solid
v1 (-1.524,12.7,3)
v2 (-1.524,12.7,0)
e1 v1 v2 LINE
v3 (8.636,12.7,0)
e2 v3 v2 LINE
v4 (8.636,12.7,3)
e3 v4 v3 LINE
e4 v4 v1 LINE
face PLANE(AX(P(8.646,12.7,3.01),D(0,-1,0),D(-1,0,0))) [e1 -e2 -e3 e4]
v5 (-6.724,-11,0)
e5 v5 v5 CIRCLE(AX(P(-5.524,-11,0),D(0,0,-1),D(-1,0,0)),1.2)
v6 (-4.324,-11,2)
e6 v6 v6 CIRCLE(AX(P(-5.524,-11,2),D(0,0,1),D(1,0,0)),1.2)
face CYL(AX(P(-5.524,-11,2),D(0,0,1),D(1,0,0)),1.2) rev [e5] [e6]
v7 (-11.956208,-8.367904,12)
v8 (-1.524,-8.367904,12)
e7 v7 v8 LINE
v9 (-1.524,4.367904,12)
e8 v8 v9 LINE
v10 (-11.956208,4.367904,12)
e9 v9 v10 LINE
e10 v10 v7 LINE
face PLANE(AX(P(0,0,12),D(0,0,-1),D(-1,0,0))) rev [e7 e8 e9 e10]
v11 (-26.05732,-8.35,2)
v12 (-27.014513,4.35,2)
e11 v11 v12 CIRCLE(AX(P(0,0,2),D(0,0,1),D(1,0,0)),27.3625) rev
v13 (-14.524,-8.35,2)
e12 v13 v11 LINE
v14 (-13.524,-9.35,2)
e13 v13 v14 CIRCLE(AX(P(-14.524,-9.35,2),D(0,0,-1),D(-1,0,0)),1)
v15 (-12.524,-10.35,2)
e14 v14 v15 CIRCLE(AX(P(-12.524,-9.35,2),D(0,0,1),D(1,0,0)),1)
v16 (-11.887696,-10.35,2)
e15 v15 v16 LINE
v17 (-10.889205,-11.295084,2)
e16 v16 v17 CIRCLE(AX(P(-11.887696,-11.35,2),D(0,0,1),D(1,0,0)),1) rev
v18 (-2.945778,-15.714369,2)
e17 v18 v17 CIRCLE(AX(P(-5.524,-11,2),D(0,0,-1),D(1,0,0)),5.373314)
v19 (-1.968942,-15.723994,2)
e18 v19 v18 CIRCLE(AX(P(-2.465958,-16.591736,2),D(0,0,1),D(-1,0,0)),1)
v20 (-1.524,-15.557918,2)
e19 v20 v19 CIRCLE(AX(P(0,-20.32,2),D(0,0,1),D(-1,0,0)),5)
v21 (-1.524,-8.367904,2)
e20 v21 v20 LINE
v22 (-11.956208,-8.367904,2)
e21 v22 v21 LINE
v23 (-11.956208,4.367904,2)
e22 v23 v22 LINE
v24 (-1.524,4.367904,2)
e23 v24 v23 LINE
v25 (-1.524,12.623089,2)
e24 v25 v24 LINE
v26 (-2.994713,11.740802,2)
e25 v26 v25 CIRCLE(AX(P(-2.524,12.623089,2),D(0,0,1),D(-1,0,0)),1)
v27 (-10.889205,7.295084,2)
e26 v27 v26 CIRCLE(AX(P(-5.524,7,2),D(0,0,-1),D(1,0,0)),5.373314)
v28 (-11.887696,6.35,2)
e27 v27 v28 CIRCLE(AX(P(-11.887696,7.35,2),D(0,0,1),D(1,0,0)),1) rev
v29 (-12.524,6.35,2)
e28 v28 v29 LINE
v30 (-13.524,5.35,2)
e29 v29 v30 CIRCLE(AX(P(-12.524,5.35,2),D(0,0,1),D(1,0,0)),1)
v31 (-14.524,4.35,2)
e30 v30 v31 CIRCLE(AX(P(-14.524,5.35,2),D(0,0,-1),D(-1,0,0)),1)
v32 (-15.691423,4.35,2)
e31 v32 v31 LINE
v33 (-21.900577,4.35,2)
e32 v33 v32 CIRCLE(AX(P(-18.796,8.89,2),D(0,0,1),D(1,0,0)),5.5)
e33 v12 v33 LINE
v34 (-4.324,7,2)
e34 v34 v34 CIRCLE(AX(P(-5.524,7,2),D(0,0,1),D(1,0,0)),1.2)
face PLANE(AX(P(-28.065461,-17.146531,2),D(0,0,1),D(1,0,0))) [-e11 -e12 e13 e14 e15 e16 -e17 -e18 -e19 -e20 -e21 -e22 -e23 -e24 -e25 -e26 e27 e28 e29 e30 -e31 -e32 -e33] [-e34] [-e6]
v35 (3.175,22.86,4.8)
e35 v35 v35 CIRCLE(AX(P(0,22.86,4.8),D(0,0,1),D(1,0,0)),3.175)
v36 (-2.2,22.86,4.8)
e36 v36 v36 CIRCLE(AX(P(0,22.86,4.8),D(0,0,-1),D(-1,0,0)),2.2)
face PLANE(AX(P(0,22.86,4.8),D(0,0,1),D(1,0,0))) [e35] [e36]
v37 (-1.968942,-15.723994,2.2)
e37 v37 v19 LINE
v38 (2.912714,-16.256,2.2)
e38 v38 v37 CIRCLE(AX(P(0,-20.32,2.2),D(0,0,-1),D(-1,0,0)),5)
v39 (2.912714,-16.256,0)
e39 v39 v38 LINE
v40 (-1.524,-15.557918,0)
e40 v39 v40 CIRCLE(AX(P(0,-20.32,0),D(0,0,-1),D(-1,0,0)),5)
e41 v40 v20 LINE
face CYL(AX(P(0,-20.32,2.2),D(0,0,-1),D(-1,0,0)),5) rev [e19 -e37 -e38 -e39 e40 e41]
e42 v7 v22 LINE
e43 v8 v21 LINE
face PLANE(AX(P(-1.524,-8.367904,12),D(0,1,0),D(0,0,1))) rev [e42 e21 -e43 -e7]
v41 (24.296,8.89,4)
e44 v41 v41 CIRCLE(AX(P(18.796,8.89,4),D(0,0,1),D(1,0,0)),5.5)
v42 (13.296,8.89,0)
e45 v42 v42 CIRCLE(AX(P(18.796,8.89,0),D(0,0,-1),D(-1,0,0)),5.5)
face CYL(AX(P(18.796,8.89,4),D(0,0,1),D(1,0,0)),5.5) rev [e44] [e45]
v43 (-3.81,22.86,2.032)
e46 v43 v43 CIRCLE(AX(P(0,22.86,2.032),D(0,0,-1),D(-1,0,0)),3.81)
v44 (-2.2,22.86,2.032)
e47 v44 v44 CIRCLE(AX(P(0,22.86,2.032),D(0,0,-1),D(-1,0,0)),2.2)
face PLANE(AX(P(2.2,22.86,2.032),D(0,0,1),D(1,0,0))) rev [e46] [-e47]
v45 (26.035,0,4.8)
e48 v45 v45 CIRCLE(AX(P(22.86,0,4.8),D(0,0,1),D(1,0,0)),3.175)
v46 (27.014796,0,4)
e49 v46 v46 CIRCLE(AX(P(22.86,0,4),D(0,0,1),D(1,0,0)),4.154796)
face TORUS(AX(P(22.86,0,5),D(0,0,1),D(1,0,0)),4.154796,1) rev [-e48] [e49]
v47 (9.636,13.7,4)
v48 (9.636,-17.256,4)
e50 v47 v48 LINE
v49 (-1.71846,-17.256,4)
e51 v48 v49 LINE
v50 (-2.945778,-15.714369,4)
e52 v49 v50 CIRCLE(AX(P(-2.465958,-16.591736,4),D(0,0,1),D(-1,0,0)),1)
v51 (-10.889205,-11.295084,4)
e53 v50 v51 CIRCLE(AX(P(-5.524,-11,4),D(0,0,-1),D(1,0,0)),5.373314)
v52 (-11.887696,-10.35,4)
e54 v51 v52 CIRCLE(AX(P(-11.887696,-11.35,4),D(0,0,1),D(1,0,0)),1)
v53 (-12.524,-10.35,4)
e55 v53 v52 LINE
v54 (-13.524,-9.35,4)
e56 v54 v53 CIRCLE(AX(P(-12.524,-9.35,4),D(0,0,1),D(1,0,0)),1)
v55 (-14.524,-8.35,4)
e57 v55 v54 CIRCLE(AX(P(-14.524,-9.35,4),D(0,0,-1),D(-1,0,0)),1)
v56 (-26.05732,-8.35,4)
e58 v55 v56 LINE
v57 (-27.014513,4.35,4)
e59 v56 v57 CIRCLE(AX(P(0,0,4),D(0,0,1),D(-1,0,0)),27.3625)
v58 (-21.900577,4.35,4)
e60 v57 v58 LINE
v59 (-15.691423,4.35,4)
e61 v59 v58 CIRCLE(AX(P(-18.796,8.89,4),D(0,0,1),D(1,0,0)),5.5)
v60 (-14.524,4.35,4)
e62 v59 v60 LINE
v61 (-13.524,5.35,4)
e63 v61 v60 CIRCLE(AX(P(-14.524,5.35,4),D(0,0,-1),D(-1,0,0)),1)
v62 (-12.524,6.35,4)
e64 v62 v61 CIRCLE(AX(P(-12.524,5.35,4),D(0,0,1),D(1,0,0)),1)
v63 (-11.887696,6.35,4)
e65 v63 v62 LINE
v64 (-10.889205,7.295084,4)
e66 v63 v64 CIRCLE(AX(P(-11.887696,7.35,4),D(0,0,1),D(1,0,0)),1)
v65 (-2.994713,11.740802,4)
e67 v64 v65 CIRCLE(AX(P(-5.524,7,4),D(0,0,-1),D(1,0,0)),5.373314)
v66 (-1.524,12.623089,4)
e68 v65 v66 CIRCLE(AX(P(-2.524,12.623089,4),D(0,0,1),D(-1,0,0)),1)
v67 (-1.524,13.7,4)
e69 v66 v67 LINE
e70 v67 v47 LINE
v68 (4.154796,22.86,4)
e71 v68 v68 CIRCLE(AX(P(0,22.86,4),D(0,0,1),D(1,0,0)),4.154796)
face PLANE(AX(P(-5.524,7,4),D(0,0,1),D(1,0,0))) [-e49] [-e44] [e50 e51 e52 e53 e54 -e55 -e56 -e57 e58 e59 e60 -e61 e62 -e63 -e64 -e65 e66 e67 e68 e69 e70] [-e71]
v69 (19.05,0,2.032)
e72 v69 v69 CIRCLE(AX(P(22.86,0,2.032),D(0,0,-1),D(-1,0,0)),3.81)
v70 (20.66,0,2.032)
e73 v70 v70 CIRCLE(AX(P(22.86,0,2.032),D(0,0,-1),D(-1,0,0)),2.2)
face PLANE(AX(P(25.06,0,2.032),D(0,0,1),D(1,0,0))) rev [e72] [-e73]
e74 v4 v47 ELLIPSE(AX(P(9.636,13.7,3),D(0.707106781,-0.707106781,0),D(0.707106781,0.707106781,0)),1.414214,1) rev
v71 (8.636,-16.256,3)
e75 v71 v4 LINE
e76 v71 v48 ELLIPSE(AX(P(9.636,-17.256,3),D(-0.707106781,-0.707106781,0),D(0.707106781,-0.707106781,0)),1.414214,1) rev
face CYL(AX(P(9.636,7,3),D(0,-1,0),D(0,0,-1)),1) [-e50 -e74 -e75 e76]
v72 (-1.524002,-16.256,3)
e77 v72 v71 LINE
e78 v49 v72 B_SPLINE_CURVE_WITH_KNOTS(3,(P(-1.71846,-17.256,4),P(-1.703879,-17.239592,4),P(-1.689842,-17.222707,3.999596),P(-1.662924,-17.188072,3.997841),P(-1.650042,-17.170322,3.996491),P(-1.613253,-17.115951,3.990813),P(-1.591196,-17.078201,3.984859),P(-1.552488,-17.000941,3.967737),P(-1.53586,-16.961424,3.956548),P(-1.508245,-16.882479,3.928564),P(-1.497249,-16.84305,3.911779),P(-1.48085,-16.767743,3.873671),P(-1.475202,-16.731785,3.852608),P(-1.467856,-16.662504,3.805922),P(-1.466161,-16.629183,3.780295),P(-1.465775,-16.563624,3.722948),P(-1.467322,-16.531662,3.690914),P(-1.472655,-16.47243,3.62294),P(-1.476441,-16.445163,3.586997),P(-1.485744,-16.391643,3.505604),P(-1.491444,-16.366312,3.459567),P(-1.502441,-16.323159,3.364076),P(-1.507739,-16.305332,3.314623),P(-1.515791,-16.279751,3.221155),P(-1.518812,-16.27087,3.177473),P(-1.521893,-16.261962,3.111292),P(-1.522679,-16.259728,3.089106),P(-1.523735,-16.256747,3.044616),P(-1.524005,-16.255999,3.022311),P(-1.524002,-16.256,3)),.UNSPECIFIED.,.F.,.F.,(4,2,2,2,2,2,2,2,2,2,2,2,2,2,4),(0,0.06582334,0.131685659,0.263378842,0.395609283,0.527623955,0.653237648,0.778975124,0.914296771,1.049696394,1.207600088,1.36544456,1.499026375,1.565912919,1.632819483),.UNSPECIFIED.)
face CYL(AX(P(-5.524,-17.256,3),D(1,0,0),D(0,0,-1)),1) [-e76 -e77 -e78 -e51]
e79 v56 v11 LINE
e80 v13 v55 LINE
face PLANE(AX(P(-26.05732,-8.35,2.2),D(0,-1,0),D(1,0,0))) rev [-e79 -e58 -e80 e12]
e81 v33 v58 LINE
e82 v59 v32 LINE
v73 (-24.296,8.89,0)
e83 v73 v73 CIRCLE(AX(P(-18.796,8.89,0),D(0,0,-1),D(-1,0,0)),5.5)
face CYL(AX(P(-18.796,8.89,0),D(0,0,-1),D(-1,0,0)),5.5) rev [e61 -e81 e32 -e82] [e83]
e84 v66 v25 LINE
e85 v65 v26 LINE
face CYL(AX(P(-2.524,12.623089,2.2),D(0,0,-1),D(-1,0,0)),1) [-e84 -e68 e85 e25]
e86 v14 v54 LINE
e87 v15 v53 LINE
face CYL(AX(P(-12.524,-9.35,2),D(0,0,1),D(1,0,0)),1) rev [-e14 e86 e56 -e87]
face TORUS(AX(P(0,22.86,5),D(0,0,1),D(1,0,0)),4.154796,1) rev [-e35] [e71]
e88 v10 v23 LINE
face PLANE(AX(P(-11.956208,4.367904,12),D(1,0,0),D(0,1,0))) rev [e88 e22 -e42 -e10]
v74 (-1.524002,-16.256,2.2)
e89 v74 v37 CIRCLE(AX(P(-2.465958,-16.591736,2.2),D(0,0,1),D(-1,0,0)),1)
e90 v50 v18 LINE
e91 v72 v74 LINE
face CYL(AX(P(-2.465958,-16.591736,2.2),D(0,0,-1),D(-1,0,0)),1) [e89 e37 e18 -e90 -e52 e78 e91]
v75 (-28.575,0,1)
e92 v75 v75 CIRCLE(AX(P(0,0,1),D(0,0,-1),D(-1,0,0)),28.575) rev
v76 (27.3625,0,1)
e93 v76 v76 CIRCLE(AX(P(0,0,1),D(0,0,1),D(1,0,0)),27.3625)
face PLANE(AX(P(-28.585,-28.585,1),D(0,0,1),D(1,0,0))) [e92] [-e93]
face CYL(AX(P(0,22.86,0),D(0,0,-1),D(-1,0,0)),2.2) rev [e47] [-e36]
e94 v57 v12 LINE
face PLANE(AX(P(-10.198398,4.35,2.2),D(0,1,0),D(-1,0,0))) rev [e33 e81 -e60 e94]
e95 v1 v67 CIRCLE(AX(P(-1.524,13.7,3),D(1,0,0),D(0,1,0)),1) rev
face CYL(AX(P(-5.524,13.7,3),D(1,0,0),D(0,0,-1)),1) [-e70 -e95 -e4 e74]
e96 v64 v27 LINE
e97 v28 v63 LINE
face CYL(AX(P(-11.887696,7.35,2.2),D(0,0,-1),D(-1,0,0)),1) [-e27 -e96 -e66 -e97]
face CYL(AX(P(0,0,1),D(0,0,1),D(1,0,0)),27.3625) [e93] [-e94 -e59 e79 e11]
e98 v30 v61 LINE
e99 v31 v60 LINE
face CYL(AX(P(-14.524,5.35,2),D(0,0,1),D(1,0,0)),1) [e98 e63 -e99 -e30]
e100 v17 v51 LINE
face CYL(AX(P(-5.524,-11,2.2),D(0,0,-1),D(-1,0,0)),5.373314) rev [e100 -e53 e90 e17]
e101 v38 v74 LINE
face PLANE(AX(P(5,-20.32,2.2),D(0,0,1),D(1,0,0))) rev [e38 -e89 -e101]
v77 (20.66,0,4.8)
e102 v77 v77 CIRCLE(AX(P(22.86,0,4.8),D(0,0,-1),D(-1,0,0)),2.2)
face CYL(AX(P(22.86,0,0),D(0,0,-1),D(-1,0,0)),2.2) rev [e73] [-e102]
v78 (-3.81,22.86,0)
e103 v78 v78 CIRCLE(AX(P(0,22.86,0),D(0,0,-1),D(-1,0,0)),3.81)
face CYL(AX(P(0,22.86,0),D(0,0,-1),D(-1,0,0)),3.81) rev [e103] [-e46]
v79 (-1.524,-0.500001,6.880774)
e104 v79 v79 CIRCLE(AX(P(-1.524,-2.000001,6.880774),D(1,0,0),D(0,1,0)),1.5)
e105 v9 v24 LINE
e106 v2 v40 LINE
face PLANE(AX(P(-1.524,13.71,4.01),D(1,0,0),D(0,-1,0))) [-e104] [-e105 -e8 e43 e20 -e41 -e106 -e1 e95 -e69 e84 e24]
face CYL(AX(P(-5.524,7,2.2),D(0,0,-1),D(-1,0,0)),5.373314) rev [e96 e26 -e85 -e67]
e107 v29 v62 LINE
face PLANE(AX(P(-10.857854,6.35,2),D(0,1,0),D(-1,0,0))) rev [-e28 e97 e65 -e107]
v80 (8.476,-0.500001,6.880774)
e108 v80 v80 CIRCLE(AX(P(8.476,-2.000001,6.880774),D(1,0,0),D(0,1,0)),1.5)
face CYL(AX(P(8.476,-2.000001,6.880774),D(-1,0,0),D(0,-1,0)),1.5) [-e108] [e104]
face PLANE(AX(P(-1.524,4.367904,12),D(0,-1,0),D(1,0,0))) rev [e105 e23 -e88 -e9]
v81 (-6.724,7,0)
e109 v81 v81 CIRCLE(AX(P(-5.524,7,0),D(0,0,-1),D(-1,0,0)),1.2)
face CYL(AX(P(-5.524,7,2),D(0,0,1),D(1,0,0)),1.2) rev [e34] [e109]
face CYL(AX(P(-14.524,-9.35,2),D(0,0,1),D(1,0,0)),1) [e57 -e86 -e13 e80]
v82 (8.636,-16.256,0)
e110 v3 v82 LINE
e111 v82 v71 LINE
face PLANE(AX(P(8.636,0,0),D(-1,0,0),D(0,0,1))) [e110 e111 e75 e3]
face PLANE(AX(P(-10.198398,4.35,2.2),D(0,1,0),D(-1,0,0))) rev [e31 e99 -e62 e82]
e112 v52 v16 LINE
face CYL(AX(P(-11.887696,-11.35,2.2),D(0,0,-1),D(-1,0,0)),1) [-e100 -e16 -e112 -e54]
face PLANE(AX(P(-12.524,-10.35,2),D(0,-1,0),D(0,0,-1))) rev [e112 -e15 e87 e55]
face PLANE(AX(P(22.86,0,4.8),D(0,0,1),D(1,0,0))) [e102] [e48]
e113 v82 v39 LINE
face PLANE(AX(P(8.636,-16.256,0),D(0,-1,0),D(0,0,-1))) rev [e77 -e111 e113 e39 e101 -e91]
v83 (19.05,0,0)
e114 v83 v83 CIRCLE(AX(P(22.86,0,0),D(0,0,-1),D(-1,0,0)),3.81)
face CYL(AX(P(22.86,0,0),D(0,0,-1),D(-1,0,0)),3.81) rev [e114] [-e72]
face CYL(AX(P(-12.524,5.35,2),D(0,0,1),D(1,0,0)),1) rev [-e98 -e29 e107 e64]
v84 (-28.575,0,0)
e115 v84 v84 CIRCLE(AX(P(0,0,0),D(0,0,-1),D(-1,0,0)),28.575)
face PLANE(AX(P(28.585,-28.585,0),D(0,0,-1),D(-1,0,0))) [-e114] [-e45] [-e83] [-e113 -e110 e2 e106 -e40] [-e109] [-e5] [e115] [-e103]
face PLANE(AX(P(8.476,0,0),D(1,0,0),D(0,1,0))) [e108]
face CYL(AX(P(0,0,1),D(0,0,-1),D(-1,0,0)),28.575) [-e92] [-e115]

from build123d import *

# Parameters (mm, degrees)
BOSS_EXTRUDE1_START                              = -2
BOSS_EXTRUDE1_OUTLINE_R                          = 27.3625
BOSS_EXTRUDE1_DEPTH                              = 2
BOSS_EXTRUDE1_2_DEPTH                            = 0.2
BOSS_EXTRUDE1_3_OUTLINE_R                        = 28.575
BOSS_EXTRUDE1_3_OUTLINE_R_2                      = 27.3625
BOSS_EXTRUDE1_3_DEPTH                            = 1
SKETCH2_W                                        = 2.2
SKETCH2_H                                        = 28.956
CUT_EXTRUDE1_DEPTH                               = 5.723285802
BOSS_EXTRUDE2_DEPTH                              = 1.8
CUT_EXTRUDE2_START                               = -2
CUT_EXTRUDE2_DEPTH                               = 2
CUT_EXTRUDE3_START                               = -2
CUT_EXTRUDE3_DEPTH                               = 2
SKETCH6_W                                        = 5
SKETCH6_H                                        = 2.2
F_11_0_11_DIAMETER_HOLE1_D                       = 11
F_11_0_11_DIAMETER_HOLE2_D                       = 11
F_11_0_11_DIAMETER_HOLE2_DEPTH                   = 4.8
F_2_4_2_4_DIAMETER_HOLE1_D                       = 2.4
CBORE_FOR_M4_HEX_HEAD_MACHINE_SCREW1_D           = 4.4
CBORE_FOR_M4_HEX_HEAD_MACHINE_SCREW1_CBORE_D     = 7.62
CBORE_FOR_M4_HEX_HEAD_MACHINE_SCREW1_CBORE_DEPTH = 2.032
FILLET1_R                                        = 1
SKETCH17_W                                       = 10.432207601
SKETCH17_H                                       = 12.73580757
BOSS_EXTRUDE3_DEPTH                              = 10
SKETCH18_R                                       = 1.5
BOSS_EXTRUDE4_DEPTH                              = 10


with BuildPart() as part:
    # Boss-Extrude1: read off the stored shape, not the designer's step
    # Boss-Extrude1 outline → Boss-Extrude1 (new body)
    with BuildSketch(Plane.XY.offset(2).offset(BOSS_EXTRUDE1_START)):
        Circle(BOSS_EXTRUDE1_OUTLINE_R)
        with BuildLine():
            Line((-1.524, -15.557918103), (-1.524, 12.7))
            Line((-1.524, 12.7), (2.912714198, 12.7))
            Line((2.912714198, 12.7), (2.912714198, -16.256))
            ThreePointArc((2.912714198, -16.256), (0.777149513, -15.38076538), (-1.524, -15.557918103))
        make_face(mode=Mode.SUBTRACT)
    extrude(amount=BOSS_EXTRUDE1_DEPTH)

    # Boss-Extrude1 2 outline → Boss-Extrude1 2 (add)
    with BuildSketch(Plane.XY.offset(2)):
        with BuildLine():
            ThreePointArc((2.912714198, -16.256), (0.541695497, -15.349430014), (-1.968941943, -15.723994384))
            ThreePointArc((-1.968941943, -15.723994384), (-2.456104545, -15.591784186), (-2.945777915, -15.714368556))
            ThreePointArc((-2.945777915, -15.714368556), (-9.352442215, -14.770348817), (-10.198398357, -8.35))
            Line((-10.198398357, -8.35), (-26.057319629, -8.35))
            ThreePointArc((-26.057319629, -8.35), (27.285112269, 2.056466564), (-27.014512882, 4.35))
            Line((-27.014512882, 4.35), (-10.198398357, 4.35))
            ThreePointArc((-10.198398357, 4.35), (-9.371903961, 10.750484649), (-2.994712748, 11.740802252))
            ThreePointArc((-2.994712748, 11.740802252), (-2.00956475, 11.765559549), (-1.524, 12.623088776))
            Line((-1.524, 12.623088776), (-1.524, 12.7))
            Line((-1.524, 12.7), (2.912714198, 12.7))
            Line((2.912714198, 12.7), (2.912714198, -16.256))
        make_face()
    extrude(amount=BOSS_EXTRUDE1_2_DEPTH)

    # Boss-Extrude1 3 outline → Boss-Extrude1 3 (add)
    with BuildSketch(Plane.XY.offset(2).offset(BOSS_EXTRUDE1_START)):
        Circle(BOSS_EXTRUDE1_3_OUTLINE_R)
        Circle(BOSS_EXTRUDE1_3_OUTLINE_R_2, mode=Mode.SUBTRACT)
    extrude(amount=BOSS_EXTRUDE1_3_DEPTH)

    # Sketch2 → Cut-Extrude1 (cut)
    with BuildSketch(Plane.ZY.offset(-2.912714198)):
        with Locations((1.1, -1.778)):
            Rectangle(SKETCH2_W, SKETCH2_H)
    extrude(amount=-CUT_EXTRUDE1_DEPTH, mode=Mode.SUBTRACT)

    # Sketch3 → Boss-Extrude2 (add)
    with BuildSketch(Plane.XY.offset(2.2)):
        with BuildLine():
            Line((-10.198398357, 4.35), (-27.014512882, 4.35))
            ThreePointArc((-27.014512882, 4.35), (27.285112269, 2.056466564), (-26.057319629, -8.35))
            Line((-26.057319629, -8.35), (-10.198398357, -8.35))
            ThreePointArc((-10.198398357, -8.35), (-9.352442215, -14.770348817), (-2.945777915, -15.714368556))
            ThreePointArc((-2.945777915, -15.714368556), (-2.109961399, -15.657248447), (-1.524001902, -16.256))
            Line((-1.524001902, -16.256), (8.636, -16.256))
            Line((8.636, -16.256), (8.636, 12.7))
            Line((8.636, 12.7), (-1.524, 12.7))
            Line((-1.524, 12.7), (-1.524, 12.623088776))
            ThreePointArc((-1.524, 12.623088776), (-2.00956475, 11.765559549), (-2.994712748, 11.740802252))
            ThreePointArc((-2.994712748, 11.740802252), (-9.371903961, 10.750484649), (-10.198398357, 4.35))
        make_face()
    extrude(amount=BOSS_EXTRUDE2_DEPTH)

    # Sketch4 → Cut-Extrude2 (cut)
    with BuildSketch(Plane.XY.offset(4).offset(CUT_EXTRUDE2_START)):
        with BuildLine():
            Line((-14.524, 4.35), (-10.198398357, 4.35))
            ThreePointArc((-10.198398357, 4.35), (-10.627065698, 5.317376904), (-10.857854141, 6.35))
            Line((-10.857854141, 6.35), (-12.524, 6.35))
            ThreePointArc((-12.524, 6.35), (-13.231106781, 6.057106781), (-13.524, 5.35))
            ThreePointArc((-13.524, 5.35), (-13.816893219, 4.642893219), (-14.524, 4.35))
        make_face()
    extrude(amount=CUT_EXTRUDE2_DEPTH, mode=Mode.SUBTRACT)

    # Sketch5 → Cut-Extrude3 (cut)
    with BuildSketch(Plane.XY.offset(4).offset(CUT_EXTRUDE3_START)):
        with BuildLine():
            Line((-12.524, -10.35), (-10.857854141, -10.35))
            ThreePointArc((-10.857854141, -10.35), (-10.627065698, -9.317376904), (-10.198398357, -8.35))
            Line((-10.198398357, -8.35), (-14.524, -8.35))
            ThreePointArc((-14.524, -8.35), (-13.816893219, -8.642893219), (-13.524, -9.35))
            ThreePointArc((-13.524, -9.35), (-13.231106781, -10.057106781), (-12.524, -10.35))
        make_face()
    extrude(amount=CUT_EXTRUDE3_DEPTH, mode=Mode.SUBTRACT)

    # Sketch6 → Cut-Revolve1 (revolve, cut)
    with BuildSketch(Plane.XZ.offset(20.32)):
        with Locations((2.5, 1.1)):
            Rectangle(SKETCH6_W, SKETCH6_H)
    revolve(axis=Axis((0, -20.32, 2.2), (0, 0, -1)), mode=Mode.SUBTRACT)

    # Sketch7 → Revolve1 (revolve)
    with BuildSketch(Plane(origin=(0, 22.86, 0), x_dir=(1, 0, 0), z_dir=(0, 1, 0))):
        with BuildLine():
            Line((4.154795897, -4), (0, -4))
            Line((0, -4), (0, -4.8))
            Line((0, -4.8), (3.175, -4.8))
            ThreePointArc((3.175, -4.8), (3.522340365, -4.225403331), (4.154795897, -4))
        make_face()
    revolve(axis=Axis((0, 22.86, 4), (0, 0, 1)))

    # Sketch8 → Revolve2 (revolve)
    with BuildSketch(Plane(origin=(0, 0, 0), x_dir=(1, 0, 0), z_dir=(0, 1, 0))):
        with BuildLine():
            Line((27.014795897, -4), (22.86, -4))
            Line((22.86, -4), (22.86, -4.8))
            Line((22.86, -4.8), (26.035, -4.8))
            ThreePointArc((26.035, -4.8), (26.382340365, -4.225403331), (27.014795897, -4))
        make_face()
    revolve(axis=Axis((22.86, 0, 4), (0, 0, 1)))

    # Ø11.0 (11) Diameter Hole1 (through all)
    with Locations(Plane.XY.offset(4)):
        with Locations((18.796, 8.89)):
            Hole(F_11_0_11_DIAMETER_HOLE1_D / 2)

    # Ø11.0 (11) Diameter Hole2
    with Locations(Plane(origin=(0, 0, 0), x_dir=(-1, 0, 0), z_dir=(0, 0, -1))):
        with Locations((18.796, 8.89)):
            Hole(F_11_0_11_DIAMETER_HOLE2_D / 2, depth=F_11_0_11_DIAMETER_HOLE2_DEPTH)

    # Ø2.4 (2.4) Diameter Hole1 (through all)
    with Locations(Plane.XY.offset(2)):
        with Locations((-5.524, 7), (-5.524, -11)):
            Hole(F_2_4_2_4_DIAMETER_HOLE1_D / 2)

    # CBORE for M4 Hex Head Machine Screw1 (through all)
    with Locations(Plane(origin=(0, 0, 0), x_dir=(-1, 0, 0), z_dir=(0, 0, -1))):
        with Locations((-22.86, 0), (0, 22.86)):
            CounterBoreHole(CBORE_FOR_M4_HEX_HEAD_MACHINE_SCREW1_D / 2, CBORE_FOR_M4_HEX_HEAD_MACHINE_SCREW1_CBORE_D / 2, CBORE_FOR_M4_HEX_HEAD_MACHINE_SCREW1_CBORE_DEPTH)

    # Fillet1
    fillet1_edges = [part.edges().sort_by_distance(p)[0] for p in [
        (3.556, 12.7, 4),
        (8.636, -1.778, 4),
        (3.555999049, -16.256, 4),
        (-10.857854141, -10.35, 3.1),
        (-10.857854141, 6.35, 3.1),
    ]]
    fillet(fillet1_edges, radius=FILLET1_R)

    # Sketch17 → Boss-Extrude3 (add)
    with BuildSketch(Plane.XY.offset(2)):
        with Locations((-6.740103801, -2)):
            Rectangle(SKETCH17_W, SKETCH17_H)
    extrude(amount=BOSS_EXTRUDE3_DEPTH)

    # Sketch18 → Boss-Extrude4 (add)
    with BuildSketch(Plane(origin=(-1.524, 0, 0), x_dir=(0, 0, -1), z_dir=(1, 0, 0))):
        with Locations(Location((-6.880774337, -2.000001215, 0), (0, 0, 90))):
            Circle(SKETCH18_R)
    extrude(amount=BOSS_EXTRUDE4_DEPTH)


solid = part.part
